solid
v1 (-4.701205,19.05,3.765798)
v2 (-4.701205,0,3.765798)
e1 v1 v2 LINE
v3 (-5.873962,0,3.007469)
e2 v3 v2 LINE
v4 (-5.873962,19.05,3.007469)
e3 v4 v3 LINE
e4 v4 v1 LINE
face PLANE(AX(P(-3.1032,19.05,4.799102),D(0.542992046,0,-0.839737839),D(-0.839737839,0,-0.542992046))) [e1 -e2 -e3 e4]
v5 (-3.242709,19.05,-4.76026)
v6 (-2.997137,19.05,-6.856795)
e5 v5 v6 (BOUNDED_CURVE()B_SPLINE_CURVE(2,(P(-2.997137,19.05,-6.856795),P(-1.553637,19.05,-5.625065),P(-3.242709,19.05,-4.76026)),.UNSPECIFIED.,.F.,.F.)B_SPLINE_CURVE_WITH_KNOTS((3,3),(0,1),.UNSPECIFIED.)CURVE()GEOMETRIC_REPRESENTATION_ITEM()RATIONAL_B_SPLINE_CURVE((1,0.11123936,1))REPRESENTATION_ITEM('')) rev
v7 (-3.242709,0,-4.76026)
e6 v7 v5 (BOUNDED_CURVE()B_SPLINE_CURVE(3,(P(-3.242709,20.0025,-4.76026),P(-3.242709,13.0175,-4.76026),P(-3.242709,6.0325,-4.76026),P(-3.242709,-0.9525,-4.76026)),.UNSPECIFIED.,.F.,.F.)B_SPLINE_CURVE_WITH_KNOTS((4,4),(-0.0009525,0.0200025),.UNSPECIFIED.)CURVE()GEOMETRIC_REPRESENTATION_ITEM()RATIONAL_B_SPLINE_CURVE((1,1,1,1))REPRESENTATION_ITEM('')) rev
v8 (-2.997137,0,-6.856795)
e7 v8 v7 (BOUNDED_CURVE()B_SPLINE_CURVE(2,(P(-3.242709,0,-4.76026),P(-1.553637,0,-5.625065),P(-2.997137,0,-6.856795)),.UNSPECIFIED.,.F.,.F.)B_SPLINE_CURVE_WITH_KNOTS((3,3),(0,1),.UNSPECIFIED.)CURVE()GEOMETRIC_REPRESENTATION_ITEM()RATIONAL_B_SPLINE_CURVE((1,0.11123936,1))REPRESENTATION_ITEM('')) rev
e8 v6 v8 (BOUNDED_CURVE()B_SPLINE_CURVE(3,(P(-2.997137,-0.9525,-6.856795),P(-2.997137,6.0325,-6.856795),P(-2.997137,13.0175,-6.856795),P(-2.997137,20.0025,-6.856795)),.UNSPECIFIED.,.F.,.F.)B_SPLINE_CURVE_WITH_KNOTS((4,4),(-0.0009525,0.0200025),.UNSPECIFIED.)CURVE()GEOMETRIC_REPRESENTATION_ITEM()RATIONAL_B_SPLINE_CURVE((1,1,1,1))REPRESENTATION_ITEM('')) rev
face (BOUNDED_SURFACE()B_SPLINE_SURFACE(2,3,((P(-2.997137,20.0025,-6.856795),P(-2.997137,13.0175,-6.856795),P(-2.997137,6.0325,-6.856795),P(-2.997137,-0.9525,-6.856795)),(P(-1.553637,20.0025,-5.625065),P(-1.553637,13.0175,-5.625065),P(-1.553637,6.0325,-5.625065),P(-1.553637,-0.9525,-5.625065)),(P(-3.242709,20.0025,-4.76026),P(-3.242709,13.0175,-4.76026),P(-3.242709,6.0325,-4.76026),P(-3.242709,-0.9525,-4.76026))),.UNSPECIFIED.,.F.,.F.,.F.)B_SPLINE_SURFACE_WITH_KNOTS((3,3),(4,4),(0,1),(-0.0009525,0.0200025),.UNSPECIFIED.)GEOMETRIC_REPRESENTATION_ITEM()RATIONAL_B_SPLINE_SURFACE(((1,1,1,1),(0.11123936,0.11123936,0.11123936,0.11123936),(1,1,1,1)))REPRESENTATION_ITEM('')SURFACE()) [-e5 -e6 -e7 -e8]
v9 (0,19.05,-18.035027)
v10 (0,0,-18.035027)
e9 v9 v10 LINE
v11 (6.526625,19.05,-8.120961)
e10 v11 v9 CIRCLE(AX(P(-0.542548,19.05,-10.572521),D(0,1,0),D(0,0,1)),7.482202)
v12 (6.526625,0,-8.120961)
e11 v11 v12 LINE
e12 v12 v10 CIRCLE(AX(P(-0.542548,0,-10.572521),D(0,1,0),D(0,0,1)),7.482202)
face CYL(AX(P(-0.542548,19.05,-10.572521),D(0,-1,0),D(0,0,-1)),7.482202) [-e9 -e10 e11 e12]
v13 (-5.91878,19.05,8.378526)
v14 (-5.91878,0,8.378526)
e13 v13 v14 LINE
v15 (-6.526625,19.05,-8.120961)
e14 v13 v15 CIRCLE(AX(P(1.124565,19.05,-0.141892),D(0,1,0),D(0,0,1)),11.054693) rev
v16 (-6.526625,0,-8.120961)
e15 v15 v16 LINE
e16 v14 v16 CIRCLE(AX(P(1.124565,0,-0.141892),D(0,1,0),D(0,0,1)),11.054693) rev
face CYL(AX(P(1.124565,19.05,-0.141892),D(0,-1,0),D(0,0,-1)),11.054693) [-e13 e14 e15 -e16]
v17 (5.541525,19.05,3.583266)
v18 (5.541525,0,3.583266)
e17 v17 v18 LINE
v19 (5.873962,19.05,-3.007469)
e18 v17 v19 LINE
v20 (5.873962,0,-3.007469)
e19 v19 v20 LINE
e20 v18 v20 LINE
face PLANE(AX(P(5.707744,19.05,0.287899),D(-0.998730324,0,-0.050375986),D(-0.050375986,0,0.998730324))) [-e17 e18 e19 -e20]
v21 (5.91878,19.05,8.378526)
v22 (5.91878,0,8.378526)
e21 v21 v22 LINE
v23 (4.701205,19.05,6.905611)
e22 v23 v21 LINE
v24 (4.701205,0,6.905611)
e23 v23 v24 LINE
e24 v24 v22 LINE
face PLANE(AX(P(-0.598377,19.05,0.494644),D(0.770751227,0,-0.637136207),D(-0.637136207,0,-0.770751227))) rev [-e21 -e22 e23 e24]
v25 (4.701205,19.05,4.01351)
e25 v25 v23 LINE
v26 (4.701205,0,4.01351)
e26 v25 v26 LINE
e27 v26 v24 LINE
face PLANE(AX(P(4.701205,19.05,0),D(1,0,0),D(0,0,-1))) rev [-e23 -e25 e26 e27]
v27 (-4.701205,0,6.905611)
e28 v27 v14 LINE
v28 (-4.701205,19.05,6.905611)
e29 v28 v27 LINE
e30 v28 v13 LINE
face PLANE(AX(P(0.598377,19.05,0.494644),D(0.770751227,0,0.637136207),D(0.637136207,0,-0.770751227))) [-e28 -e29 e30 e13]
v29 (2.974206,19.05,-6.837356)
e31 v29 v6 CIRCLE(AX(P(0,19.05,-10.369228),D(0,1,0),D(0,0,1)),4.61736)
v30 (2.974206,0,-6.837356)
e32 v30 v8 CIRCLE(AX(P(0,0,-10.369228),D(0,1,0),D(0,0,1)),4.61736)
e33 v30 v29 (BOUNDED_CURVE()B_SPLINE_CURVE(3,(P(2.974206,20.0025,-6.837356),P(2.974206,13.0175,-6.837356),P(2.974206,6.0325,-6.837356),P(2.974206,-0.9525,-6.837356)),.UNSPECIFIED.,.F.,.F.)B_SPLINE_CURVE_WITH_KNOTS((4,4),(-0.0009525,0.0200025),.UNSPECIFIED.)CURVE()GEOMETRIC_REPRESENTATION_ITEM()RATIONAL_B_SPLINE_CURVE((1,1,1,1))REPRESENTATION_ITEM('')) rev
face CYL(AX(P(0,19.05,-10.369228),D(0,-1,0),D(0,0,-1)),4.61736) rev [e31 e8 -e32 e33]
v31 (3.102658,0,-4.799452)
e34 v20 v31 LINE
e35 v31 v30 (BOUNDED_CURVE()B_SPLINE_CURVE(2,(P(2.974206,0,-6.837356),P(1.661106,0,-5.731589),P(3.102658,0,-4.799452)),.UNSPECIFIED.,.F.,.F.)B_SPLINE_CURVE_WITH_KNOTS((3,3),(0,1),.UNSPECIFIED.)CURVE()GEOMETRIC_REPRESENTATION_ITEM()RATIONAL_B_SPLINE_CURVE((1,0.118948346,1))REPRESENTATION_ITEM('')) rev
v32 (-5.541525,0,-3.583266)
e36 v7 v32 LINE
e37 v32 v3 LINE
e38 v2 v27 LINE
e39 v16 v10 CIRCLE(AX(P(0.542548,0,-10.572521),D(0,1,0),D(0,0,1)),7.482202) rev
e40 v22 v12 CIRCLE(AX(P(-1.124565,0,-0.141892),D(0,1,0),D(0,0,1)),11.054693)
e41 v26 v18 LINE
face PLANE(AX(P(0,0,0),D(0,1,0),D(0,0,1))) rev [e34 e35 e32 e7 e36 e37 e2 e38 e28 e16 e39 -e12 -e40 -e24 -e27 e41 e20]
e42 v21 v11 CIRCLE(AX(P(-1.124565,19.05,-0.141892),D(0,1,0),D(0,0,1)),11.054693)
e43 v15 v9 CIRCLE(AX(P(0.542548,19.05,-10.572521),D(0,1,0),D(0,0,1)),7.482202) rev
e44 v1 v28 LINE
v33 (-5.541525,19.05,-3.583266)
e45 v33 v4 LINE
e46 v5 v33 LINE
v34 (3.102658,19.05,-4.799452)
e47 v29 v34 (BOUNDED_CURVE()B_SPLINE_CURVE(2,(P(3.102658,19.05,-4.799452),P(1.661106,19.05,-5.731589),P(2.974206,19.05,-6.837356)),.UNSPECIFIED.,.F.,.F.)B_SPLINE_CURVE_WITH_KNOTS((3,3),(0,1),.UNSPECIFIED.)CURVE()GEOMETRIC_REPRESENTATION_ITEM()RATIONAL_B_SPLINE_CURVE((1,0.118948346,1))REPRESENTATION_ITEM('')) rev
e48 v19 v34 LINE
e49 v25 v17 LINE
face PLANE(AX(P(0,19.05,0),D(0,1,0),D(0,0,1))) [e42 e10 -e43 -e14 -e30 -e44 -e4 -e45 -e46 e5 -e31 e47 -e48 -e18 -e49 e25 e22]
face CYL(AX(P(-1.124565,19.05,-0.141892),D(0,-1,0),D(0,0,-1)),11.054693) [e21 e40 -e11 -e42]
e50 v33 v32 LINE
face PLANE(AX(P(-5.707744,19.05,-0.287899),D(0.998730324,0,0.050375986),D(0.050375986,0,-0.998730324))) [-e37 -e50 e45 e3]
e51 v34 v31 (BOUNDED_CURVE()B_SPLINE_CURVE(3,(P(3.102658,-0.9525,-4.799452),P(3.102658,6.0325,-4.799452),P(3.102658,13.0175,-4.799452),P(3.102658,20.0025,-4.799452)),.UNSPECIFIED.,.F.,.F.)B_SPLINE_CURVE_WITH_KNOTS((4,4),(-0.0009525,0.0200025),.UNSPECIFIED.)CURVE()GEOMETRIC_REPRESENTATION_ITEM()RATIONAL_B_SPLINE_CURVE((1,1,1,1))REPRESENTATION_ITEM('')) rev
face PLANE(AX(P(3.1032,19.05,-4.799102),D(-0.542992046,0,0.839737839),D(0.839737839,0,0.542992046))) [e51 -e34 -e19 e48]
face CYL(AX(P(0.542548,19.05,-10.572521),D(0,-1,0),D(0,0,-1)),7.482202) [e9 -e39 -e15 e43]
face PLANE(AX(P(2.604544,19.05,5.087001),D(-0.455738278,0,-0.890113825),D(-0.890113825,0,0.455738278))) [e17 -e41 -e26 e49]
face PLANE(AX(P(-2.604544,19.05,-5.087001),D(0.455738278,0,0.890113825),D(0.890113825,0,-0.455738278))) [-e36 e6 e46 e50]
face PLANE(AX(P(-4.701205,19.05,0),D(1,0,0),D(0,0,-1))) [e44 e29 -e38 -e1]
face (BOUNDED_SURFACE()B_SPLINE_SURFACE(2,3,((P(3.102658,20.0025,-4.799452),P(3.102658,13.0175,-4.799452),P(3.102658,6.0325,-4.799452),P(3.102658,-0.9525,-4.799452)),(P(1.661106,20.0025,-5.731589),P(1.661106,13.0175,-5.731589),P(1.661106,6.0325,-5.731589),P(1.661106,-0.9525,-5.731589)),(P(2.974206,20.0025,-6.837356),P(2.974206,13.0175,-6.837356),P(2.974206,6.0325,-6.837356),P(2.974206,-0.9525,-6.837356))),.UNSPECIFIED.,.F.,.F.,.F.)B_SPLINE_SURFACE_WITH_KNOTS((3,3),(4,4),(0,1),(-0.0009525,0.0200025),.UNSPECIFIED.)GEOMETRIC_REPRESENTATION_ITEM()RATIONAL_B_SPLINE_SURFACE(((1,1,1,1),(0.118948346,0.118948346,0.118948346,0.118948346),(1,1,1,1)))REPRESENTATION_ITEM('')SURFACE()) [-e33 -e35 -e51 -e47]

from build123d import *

# Parameters (mm, degrees)
BOSS_EXTRUDE1_DEPTH = 19.05


with BuildPart() as part:
    # Sketch3 → Boss-Extrude1 (new body)
    with BuildSketch(Plane(origin=(0, 0, 0), x_dir=(1, 0, 0), z_dir=(0, 1, 0))):
        with BuildLine():
            Line((-5.541525375, 3.58326618), (-2.47962532, 5.150959008))
            Line((-2.47962532, 5.150959008), (-2.47962532, 6.474170352))
            ThreePointArc((-2.47962532, 6.474170352), (-2.221563685, 14.417025562), (4.617359972, 10.369227654))
            ThreePointArc((4.617359972, 10.369227654), (4.047797908, 8.147663968), (2.47962532, 6.474170352))
            Line((2.47962532, 6.474170352), (2.47962532, 5.20231788))
            Line((2.47962532, 5.20231788), (5.873962228, 3.007468661))
            Line((5.873962228, 3.007468661), (5.541525375, -3.58326618))
            Line((5.541525375, -3.58326618), (4.701204968, -4.013510228))
            Line((4.701204968, -4.013510228), (4.701204968, -6.905610932))
            Line((4.701204968, -6.905610932), (5.918780254, -8.378526195))
            ThreePointArc((5.918780254, -8.378526195), (9.922634137, -0.265088751), (6.526624698, 8.120961152))
            ThreePointArc((6.526624698, 8.120961152), (5.706991897, 14.686716316), (0, 18.035026682))
            ThreePointArc((0, 18.035026682), (-5.706991897, 14.686716316), (-6.526624698, 8.120961152))
            ThreePointArc((-6.526624698, 8.120961152), (-9.922634137, -0.265088751), (-5.918780254, -8.378526195))
            Line((-5.918780254, -8.378526195), (-4.701204968, -6.905610932))
            Line((-4.701204968, -6.905610932), (-4.701204968, -3.765798027))
            Line((-4.701204968, -3.765798027), (-5.873962228, -3.007468661))
            Line((-5.873962228, -3.007468661), (-5.541525375, 3.58326618))
        make_face()
        with BuildLine():
            Line((-2.47962532, 6.474170352), (-2.47962532, 5.150959008))
            Line((-2.47962532, 5.150959008), (-1.063503338, 5.876013463))
            ThreePointArc((-1.063503338, 5.876013463), (-1.79663243, 6.115743784), (-2.47962532, 6.474170352))
        make_face()
        with BuildLine():
            ThreePointArc((2.47962532, 6.474170352), (1.921985685, 6.17089654), (1.328021538, 5.946968965))
            Line((1.328021538, 5.946968965), (2.47962532, 5.20231788))
            Line((2.47962532, 5.20231788), (2.47962532, 6.474170352))
        make_face()
    extrude(amount=BOSS_EXTRUDE1_DEPTH)

    # Fillet6
    # a fillet whose section is not a circle: 1.27 mm, written as the material it takes off along each edge
    with BuildSketch(Plane(origin=(1.328021538, -5.283304691, -5.946968965), x_dir=(0.8397378391322112, 0, 0.5429920455490709), z_dir=(0, 1, 0))) as fillet6_piece_1:
        with BuildLine():
            Bezier((2.113321876, 0), (0.3966534, 0), (0.898889741, 1.641556979), weights=[1, 0.118948346, 1])
            ThreePointArc((0.898889741, 1.641556979), (0.533488386, 0.774757636), (0, 0))
            Line((0, 0), (2.113321876, 0))
        make_face()
    extrude(amount=29.616609382, mode=Mode.SUBTRACT)
    with BuildSketch(Plane(origin=(-1.063503338, -6.120582224, -5.876013463), x_dir=(-0.891835980226881, 0, -0.4523589110128793), z_dir=(0, 1, 0))) as fillet6_piece_2:
        with BuildLine():
            Bezier((2.168149873, 0), (0.323600022, 0.445521101), (1.438773255, 1.980852292), weights=[1, 0.11123936, 1])
            Line((1.438773255, 1.980852292), (0, 0))
            ThreePointArc((0, 0), (1.084074937, 0.129064678), (2.168149873, 0))
        make_face()
    extrude(amount=31.291164449, mode=Mode.SUBTRACT)


solid = part.part
